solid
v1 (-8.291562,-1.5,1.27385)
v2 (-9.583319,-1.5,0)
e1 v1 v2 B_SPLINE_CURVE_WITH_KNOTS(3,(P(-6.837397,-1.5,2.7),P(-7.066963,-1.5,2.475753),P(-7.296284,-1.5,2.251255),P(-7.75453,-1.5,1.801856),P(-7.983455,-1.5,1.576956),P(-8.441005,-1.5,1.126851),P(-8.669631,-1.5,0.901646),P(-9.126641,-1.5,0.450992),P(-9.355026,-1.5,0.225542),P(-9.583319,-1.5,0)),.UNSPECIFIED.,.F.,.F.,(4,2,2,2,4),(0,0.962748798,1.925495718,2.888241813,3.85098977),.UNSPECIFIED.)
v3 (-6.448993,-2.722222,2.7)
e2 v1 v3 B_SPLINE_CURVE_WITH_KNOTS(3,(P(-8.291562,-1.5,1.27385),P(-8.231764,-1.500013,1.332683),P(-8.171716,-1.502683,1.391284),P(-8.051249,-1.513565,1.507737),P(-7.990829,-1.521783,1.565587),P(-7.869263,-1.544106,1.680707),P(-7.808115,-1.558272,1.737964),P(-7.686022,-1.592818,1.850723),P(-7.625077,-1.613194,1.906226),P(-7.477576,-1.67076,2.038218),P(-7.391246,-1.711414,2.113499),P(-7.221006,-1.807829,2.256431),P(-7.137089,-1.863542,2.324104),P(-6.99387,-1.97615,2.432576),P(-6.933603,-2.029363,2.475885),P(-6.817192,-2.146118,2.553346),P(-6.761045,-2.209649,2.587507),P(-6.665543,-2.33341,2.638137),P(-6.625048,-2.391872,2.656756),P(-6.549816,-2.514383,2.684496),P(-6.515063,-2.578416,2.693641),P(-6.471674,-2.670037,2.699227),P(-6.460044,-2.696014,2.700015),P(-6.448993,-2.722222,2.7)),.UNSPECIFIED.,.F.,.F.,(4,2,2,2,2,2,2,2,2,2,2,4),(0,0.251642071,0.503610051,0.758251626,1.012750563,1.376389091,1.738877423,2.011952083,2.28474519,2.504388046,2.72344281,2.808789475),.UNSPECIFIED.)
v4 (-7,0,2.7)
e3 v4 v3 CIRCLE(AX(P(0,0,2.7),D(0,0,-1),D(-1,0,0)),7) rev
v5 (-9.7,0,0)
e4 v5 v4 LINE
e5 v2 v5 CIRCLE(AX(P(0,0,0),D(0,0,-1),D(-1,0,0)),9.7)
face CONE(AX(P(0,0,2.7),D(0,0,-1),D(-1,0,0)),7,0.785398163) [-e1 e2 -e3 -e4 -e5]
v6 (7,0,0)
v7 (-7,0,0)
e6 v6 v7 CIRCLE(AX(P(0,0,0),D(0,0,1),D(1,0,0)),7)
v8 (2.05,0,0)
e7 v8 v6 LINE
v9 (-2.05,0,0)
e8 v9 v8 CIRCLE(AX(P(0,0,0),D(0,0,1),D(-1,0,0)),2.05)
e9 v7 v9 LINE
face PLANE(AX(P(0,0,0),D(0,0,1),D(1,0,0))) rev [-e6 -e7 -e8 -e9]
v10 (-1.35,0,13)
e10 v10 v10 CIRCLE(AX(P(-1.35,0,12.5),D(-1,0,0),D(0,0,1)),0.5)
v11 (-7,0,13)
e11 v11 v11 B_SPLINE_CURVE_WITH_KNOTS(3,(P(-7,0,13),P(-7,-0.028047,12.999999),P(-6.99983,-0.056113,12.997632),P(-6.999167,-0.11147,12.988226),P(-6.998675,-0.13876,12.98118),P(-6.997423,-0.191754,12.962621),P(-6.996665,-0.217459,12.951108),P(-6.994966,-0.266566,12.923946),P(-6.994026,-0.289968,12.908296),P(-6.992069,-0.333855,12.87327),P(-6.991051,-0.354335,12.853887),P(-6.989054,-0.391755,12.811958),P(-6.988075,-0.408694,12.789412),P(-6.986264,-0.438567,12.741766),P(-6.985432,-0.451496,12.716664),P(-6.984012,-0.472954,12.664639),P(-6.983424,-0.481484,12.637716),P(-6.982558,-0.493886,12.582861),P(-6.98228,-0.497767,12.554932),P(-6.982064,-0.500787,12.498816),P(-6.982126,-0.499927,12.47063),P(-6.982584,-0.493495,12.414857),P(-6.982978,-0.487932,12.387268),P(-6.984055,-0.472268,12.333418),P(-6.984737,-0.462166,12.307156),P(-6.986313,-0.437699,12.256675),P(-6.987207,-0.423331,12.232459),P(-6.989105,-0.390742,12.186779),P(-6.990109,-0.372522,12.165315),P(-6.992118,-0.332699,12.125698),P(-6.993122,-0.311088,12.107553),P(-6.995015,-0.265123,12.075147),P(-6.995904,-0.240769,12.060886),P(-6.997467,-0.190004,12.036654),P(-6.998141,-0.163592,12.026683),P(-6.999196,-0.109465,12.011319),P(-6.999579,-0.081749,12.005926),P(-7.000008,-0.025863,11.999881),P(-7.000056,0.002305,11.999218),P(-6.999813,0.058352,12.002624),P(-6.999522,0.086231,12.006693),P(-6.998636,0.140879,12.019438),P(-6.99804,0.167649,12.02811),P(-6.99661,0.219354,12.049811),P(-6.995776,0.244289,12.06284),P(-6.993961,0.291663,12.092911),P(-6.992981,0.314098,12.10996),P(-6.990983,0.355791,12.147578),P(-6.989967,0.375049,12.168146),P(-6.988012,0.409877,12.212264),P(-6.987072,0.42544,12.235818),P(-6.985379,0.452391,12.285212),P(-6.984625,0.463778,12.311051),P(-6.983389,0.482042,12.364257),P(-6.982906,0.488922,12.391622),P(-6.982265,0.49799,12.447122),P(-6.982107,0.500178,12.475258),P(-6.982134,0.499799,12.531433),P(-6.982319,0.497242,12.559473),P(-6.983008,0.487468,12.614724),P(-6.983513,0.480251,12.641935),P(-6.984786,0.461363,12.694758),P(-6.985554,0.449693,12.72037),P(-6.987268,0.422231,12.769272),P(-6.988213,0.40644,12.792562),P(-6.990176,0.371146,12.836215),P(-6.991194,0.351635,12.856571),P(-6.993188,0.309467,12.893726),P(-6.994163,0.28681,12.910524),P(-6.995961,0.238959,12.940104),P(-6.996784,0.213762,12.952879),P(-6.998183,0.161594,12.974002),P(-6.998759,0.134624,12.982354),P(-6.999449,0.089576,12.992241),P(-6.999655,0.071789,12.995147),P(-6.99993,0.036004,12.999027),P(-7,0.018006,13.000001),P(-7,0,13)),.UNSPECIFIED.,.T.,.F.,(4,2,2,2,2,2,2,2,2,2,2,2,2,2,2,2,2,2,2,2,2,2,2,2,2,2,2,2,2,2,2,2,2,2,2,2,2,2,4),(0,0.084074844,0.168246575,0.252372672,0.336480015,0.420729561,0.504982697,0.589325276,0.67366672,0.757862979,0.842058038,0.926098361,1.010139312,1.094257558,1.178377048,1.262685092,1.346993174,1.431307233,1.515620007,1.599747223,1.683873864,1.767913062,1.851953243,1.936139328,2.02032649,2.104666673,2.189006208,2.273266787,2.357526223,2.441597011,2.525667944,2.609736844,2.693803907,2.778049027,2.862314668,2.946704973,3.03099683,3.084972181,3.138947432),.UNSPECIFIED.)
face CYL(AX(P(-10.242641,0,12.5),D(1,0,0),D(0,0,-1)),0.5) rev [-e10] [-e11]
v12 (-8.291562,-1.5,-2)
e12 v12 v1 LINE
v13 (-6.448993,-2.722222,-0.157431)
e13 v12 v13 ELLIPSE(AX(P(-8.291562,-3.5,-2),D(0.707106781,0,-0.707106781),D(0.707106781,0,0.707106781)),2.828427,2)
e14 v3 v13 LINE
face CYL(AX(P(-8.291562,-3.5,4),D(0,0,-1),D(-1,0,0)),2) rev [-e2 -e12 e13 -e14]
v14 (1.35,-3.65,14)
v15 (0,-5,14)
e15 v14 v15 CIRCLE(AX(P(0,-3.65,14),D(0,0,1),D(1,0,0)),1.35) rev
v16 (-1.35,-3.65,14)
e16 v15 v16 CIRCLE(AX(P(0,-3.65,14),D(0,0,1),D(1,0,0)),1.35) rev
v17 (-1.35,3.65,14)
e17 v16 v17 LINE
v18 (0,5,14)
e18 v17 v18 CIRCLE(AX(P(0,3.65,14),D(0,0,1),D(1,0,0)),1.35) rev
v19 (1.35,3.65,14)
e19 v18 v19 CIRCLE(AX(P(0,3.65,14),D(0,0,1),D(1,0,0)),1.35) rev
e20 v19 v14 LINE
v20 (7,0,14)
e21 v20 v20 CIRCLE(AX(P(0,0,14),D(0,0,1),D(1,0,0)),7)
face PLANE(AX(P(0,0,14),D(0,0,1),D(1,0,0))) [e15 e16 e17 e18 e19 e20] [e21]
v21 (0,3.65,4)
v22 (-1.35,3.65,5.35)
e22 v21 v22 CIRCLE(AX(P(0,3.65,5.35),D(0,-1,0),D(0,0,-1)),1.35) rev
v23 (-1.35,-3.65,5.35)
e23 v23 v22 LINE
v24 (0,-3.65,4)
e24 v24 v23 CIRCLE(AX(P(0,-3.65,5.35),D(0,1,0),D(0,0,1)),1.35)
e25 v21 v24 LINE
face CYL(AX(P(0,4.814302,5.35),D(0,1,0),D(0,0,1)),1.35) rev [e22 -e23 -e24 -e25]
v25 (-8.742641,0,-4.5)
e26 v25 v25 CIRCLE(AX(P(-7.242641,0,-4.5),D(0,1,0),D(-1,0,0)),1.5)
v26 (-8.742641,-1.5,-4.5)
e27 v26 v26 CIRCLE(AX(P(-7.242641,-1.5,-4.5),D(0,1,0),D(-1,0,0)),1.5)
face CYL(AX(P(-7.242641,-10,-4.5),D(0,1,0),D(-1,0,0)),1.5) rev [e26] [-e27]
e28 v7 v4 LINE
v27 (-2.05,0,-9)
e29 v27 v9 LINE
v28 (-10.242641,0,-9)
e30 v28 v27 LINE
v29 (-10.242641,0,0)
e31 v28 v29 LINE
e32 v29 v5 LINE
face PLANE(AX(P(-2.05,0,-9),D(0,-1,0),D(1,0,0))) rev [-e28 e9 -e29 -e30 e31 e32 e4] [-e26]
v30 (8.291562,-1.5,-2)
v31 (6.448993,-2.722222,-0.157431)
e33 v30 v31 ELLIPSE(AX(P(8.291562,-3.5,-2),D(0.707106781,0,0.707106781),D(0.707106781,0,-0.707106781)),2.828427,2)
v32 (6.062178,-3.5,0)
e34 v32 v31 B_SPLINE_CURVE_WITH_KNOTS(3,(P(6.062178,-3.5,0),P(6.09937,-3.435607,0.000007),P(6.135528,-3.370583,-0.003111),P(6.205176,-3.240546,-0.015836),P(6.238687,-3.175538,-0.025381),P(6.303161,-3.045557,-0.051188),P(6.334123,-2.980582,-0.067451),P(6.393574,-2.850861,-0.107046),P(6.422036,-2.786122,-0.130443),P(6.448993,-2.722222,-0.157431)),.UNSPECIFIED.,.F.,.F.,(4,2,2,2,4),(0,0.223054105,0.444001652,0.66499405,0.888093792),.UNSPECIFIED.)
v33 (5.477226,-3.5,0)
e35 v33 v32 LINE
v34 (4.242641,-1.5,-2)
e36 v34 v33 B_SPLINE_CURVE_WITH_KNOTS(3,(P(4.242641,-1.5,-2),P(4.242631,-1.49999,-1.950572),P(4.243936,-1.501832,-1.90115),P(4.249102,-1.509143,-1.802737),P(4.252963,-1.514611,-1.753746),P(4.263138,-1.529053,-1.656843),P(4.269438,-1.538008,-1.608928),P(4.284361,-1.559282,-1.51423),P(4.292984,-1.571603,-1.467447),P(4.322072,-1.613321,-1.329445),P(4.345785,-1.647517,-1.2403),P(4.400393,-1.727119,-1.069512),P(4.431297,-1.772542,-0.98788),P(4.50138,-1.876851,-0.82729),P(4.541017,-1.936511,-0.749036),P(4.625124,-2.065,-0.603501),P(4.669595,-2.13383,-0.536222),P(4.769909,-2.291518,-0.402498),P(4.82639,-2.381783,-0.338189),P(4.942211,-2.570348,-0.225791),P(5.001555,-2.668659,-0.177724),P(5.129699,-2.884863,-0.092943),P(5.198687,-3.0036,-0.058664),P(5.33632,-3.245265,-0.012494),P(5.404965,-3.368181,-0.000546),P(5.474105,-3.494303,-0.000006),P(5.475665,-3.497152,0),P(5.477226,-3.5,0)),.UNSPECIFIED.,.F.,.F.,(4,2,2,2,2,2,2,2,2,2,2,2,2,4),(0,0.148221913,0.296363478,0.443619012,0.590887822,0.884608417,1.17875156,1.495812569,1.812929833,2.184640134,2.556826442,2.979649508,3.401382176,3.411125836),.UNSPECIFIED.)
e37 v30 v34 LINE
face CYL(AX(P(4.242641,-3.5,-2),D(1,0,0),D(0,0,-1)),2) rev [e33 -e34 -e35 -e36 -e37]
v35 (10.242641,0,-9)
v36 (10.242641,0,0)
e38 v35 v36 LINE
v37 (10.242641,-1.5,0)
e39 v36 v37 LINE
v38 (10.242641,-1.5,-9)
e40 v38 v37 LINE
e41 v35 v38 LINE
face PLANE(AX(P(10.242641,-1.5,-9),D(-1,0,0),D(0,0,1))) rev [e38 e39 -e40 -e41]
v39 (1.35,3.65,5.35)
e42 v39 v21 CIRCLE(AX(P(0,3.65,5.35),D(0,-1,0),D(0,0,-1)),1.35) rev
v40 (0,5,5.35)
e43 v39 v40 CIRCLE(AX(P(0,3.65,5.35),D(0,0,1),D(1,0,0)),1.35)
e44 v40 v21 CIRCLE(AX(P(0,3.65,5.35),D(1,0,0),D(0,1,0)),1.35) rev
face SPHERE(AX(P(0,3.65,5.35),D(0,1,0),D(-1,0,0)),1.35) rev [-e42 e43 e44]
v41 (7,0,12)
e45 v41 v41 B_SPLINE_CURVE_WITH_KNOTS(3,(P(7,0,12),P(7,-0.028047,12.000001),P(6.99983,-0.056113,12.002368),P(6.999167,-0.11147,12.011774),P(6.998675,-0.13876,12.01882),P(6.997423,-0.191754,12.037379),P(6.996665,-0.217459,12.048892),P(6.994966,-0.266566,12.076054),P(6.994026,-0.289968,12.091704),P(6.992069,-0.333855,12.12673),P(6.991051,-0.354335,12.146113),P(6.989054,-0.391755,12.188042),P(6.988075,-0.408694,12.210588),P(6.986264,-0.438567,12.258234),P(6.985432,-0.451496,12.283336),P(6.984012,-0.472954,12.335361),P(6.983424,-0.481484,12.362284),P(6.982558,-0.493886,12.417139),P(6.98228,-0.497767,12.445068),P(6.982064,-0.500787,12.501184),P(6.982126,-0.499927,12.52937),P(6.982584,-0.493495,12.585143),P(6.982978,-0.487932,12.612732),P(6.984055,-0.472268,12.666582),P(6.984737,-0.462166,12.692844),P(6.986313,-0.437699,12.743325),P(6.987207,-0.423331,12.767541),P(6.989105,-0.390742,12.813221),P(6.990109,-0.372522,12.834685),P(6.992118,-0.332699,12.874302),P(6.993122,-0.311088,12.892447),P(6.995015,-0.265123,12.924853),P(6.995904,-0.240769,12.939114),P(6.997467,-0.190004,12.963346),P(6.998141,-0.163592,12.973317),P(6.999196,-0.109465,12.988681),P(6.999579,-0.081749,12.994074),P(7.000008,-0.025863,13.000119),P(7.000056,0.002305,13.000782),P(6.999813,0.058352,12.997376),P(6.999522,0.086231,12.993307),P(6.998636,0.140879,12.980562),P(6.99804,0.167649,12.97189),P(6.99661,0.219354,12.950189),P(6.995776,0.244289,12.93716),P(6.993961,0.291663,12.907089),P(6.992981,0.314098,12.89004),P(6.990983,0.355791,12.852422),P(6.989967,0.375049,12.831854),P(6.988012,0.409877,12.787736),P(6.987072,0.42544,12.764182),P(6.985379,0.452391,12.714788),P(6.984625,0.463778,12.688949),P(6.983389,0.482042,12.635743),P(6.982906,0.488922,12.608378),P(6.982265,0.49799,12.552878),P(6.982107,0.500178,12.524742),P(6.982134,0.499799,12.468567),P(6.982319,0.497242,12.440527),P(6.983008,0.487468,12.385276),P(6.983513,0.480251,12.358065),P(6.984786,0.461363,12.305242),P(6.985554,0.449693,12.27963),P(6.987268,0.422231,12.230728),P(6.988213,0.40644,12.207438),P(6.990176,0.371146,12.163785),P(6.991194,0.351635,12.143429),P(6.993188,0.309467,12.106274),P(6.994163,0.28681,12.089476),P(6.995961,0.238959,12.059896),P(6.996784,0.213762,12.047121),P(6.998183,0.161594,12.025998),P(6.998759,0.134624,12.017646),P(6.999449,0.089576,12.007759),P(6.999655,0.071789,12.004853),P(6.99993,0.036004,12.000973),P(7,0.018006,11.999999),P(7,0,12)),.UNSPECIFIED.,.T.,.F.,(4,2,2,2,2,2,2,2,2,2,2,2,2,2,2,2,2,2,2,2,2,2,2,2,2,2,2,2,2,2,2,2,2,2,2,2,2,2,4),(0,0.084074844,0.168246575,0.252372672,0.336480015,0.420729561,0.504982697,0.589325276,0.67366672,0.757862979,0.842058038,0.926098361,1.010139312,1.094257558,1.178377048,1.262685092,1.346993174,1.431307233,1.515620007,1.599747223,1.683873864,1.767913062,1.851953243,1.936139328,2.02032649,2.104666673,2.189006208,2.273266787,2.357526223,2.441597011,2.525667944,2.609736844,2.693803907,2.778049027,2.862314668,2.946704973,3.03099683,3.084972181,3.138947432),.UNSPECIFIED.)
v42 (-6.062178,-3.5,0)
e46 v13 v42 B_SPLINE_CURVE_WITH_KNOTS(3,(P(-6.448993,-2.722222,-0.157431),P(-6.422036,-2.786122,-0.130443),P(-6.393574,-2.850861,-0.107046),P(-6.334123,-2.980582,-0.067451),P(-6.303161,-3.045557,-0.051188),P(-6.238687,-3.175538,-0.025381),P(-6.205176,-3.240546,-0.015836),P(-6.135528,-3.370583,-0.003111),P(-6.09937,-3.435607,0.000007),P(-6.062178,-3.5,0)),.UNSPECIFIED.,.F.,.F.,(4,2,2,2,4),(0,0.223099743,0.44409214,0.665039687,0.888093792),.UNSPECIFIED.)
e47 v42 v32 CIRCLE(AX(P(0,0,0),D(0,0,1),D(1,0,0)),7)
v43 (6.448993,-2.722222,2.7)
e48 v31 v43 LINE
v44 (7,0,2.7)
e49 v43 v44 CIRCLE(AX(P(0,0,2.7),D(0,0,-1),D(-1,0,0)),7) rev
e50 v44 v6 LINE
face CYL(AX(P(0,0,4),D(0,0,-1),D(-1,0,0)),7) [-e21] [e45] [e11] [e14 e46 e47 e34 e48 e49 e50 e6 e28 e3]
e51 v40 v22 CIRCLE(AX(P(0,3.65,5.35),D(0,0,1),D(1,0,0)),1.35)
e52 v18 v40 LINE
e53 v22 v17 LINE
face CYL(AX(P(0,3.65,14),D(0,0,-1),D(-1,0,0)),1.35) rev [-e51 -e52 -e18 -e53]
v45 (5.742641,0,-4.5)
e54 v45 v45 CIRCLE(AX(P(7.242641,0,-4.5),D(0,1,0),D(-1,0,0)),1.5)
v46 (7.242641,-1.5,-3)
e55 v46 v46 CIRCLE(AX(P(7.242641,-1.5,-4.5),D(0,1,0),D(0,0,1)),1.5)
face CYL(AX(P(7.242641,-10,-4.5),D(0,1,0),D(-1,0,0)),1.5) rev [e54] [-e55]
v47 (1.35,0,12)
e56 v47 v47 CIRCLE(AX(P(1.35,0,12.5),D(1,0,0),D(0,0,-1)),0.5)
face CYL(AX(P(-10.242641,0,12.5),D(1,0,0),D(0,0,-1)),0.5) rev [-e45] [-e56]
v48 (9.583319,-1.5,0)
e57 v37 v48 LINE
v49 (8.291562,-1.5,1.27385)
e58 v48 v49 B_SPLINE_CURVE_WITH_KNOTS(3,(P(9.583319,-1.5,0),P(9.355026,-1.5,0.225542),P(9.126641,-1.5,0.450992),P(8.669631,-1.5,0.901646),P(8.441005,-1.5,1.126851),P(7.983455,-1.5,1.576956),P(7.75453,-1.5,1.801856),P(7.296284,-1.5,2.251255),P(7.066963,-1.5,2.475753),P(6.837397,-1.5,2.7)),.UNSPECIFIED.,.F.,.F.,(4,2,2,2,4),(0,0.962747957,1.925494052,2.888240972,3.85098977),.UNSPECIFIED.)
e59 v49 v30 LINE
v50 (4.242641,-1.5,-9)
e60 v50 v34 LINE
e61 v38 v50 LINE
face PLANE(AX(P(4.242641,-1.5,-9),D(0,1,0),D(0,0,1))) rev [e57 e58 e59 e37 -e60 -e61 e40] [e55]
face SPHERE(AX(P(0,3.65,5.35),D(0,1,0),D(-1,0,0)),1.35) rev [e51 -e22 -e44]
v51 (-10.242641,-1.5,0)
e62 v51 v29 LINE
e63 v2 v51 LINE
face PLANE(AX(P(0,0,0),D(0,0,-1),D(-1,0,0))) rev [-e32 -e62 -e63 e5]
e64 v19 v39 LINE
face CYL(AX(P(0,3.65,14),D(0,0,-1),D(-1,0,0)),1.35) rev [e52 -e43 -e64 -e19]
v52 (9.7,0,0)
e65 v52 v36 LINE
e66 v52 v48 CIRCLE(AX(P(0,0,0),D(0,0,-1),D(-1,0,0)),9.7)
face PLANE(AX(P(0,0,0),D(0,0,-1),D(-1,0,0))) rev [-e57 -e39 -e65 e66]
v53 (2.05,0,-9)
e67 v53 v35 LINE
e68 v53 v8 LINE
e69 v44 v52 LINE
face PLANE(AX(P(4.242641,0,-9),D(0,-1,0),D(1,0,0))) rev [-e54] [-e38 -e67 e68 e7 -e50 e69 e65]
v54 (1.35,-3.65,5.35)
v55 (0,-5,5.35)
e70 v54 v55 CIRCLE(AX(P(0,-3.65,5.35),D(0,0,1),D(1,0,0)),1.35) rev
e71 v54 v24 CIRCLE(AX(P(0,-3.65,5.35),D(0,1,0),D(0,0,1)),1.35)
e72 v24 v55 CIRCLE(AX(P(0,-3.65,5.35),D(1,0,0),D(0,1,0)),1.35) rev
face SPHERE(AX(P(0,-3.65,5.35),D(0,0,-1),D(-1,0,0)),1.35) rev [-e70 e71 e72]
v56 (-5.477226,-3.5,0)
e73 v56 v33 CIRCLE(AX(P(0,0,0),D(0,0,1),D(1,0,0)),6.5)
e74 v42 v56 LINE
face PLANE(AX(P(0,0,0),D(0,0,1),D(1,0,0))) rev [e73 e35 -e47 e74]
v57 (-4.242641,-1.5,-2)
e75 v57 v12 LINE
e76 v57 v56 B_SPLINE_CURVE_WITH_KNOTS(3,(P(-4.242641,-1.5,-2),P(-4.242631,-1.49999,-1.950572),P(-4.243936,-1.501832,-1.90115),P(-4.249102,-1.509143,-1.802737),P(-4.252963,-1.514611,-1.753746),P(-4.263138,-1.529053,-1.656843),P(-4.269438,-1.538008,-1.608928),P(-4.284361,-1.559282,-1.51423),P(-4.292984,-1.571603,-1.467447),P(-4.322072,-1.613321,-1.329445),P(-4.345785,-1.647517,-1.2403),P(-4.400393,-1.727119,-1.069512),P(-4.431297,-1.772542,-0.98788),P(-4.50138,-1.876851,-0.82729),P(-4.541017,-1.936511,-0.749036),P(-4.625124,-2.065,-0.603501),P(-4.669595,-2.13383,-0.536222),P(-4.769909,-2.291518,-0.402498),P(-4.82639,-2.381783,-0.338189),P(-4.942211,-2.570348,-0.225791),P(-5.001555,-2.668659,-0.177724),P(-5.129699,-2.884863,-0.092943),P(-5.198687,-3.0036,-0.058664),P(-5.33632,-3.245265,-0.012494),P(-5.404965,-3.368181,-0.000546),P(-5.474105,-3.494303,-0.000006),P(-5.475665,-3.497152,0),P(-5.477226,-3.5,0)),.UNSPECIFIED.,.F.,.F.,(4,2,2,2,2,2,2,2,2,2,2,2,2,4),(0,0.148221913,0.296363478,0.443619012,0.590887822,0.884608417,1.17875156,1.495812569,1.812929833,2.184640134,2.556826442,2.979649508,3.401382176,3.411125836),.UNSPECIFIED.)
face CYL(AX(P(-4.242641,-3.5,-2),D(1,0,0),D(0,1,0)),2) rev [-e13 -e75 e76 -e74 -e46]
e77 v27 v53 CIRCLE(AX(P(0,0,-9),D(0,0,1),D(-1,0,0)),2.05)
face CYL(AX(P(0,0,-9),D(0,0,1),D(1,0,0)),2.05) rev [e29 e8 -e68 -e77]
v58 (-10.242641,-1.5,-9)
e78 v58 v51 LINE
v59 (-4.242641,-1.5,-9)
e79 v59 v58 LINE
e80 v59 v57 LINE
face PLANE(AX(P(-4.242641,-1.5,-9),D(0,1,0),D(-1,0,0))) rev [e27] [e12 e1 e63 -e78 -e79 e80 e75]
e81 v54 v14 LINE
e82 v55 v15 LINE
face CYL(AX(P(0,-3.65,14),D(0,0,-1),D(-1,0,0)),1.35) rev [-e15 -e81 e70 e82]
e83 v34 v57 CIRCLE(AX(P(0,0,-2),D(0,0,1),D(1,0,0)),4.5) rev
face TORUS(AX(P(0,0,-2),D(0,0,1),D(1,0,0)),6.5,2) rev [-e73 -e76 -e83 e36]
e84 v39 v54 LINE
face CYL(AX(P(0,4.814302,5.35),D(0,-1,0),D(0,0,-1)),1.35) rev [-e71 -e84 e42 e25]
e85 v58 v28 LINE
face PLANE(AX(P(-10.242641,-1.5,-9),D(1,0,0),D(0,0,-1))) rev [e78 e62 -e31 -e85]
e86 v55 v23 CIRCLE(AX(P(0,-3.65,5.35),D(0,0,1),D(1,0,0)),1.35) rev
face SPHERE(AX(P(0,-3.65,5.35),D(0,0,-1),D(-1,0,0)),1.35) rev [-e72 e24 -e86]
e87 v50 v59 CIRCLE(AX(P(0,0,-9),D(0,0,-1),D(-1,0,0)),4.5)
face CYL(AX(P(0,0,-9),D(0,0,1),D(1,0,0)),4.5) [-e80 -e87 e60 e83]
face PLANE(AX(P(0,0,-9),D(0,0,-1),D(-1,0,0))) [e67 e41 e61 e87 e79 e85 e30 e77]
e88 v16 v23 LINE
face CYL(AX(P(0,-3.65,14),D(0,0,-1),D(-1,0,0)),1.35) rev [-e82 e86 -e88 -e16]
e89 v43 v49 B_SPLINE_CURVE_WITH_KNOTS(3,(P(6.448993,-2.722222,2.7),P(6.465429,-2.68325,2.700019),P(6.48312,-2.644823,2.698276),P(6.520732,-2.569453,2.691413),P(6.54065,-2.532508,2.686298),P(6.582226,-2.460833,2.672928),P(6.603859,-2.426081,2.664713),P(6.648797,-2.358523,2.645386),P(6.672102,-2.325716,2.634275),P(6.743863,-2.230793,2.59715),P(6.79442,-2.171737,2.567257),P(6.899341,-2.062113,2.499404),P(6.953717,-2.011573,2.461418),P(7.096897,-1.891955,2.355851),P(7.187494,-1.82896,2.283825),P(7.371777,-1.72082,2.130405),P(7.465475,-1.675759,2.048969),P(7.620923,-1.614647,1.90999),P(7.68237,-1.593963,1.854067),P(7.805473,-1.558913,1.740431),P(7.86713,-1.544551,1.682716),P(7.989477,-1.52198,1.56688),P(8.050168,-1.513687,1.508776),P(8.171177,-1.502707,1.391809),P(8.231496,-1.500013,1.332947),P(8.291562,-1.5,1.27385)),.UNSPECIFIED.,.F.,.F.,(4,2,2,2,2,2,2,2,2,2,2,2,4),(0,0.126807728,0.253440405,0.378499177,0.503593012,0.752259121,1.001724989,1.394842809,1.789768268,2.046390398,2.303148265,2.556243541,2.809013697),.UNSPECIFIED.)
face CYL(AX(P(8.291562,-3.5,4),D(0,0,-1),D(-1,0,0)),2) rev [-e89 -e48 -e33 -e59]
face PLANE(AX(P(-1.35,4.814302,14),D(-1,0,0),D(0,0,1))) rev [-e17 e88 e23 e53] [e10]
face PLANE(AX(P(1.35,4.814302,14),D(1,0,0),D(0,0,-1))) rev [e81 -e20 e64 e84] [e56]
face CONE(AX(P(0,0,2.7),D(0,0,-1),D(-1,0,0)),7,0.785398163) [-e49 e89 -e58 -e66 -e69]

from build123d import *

# Parameters (mm, degrees)
SKETCH1_R           = 7
BOSS_EXTRUDE1_DEPTH = 4
SKETCH2_R           = 7
SKETCH2_R_2         = 5
BOSS_EXTRUDE2_DEPTH = 10
BOSS_EXTRUDE3_DEPTH = 10
BOSS_EXTRUDE4_DEPTH = 9
FILLET3_R           = 1.35
CHAMFER1_SIZE       = 2.7
SKETCH7_R           = 1.5
CUT_EXTRUDE1_DEPTH  = 10
FILLET4_R           = 2
SKETCH8_R           = 0.5
CUT_EXTRUDE2_DEPTH  = 25.534299997


# Some blends are built 0.0001 mm under size
with BuildPart() as part:
    # Sketch1 → Boss-Extrude1 (new body)
    with BuildSketch(Plane.XY):
        Circle(SKETCH1_R)
    extrude(amount=BOSS_EXTRUDE1_DEPTH)

    # Sketch2 → Boss-Extrude2 (add)
    with BuildSketch(Plane.XY.offset(4)):
        Circle(SKETCH2_R)
        Circle(SKETCH2_R_2, mode=Mode.SUBTRACT)
    extrude(amount=BOSS_EXTRUDE2_DEPTH)

    # Sketch3 → Boss-Extrude3 (add)
    with BuildSketch(Plane.XY.offset(4)):
        with BuildLine():
            Line((-1.35, 4.814301611), (-1.35, -4.814301611))
            ThreePointArc((-1.35, -4.814301611), (-5, 0), (-1.35, 4.814301611))
        make_face()
        with BuildLine():
            Line((1.35, 4.814301611), (1.35, -4.814301611))
            ThreePointArc((1.35, -4.814301611), (5, 0), (1.35, 4.814301611))
        make_face()
    extrude(amount=BOSS_EXTRUDE3_DEPTH)

    # Sketch4 → Boss-Extrude4 (add)
    with BuildSketch(Plane(origin=(0, 0, 0), x_dir=(-1, 0, 0), z_dir=(0, 0, -1))):
        with BuildLine():
            Line((2.05, 0), (4.242640687, 0))
            Line((4.242640687, 0), (10.242640687, 0))
            Line((10.242640687, 0), (10.242640687, -1.5))
            Line((10.242640687, -1.5), (4.242640687, -1.5))
            ThreePointArc((4.242640687, -1.5), (0, -4.5), (-4.242640687, -1.5))
            Line((-4.242640687, -1.5), (-10.242640687, -1.5))
            Line((-10.242640687, -1.5), (-10.242640687, 0))
            Line((-10.242640687, 0), (-4.242640687, 0))
            Line((-4.242640687, 0), (-2.05, 0))
            ThreePointArc((-2.05, 0), (0, -2.05), (2.05, 0))
        make_face()
    extrude(amount=BOSS_EXTRUDE4_DEPTH)

    # Fillet3
    fillet3_edges = [part.edges().sort_by_distance(p)[0] for p in [
        (-1.35, 4.814301611, 9),
    ]]
    fillet(fillet3_edges, radius=FILLET3_R)
    fillet3_2_edges = [part.edges().sort_by_distance(p)[0] for p in [
        (1.35, 4.814301611, 9),
    ]]
    fillet(fillet3_2_edges, radius=FILLET3_R - 0.0001)  # a hair under: the kernel refuses the full size
    fillet3_3_edges = [part.edges().sort_by_distance(p)[0] for p in [
        (1.35, -4.814301611, 9),
    ]]
    fillet(fillet3_3_edges, radius=FILLET3_R)
    fillet3_4_edges = [part.edges().sort_by_distance(p)[0] for p in [
        (-1.35, -4.814301611, 9),
    ]]
    fillet(fillet3_4_edges, radius=FILLET3_R - 0.0001)  # a hair under: the kernel refuses the full size
    fillet3_5_edges = [part.edges().sort_by_distance(p)[0] for p in [
        (-1.35, -4.9999e-05, 4),
    ]]
    fillet(fillet3_5_edges, radius=FILLET3_R - 0.0001)  # a hair under: the kernel refuses the full size

    # Chamfer1
    # the kernel refuses this chamfer: 2.7 mm, written as the material it adds along each edge
    with BuildSketch(Plane(origin=(0, 0, 0), x_dir=(-1, 0, 0), z_dir=(0, 1, 0))) as chamfer1_piece_1_section:
        Polygon((7, CHAMFER1_SIZE), (7 + CHAMFER1_SIZE, 0), (7, 0), align=None)
    chamfer1_piece_1 = revolve(axis=Axis((0, 0, 0), (0, 0, 1)), revolution_arc=69.20773796, mode=Mode.PRIVATE)
    chamfer1_piece_1 = split(chamfer1_piece_1, bisect_by=Plane(origin=(-7.851109484, -1.5, 0.900303531), z_dir=(0, 1, 0)), keep=Keep.TOP, mode=Mode.PRIVATE)
    add(chamfer1_piece_1)
    with BuildSketch(Plane(origin=(0, 0, 0), x_dir=(0.3549807082679851, -0.9348736260894087, 0), z_dir=(-0.9348736260894087, -0.3549807082679851, 0))) as chamfer1_piece_2_section:
        Polygon((7, CHAMFER1_SIZE), (7 + CHAMFER1_SIZE, 0), (7, 0), align=None)
    chamfer1_piece_2 = revolve(axis=Axis((0, 0, 0), (0, 0, 1)), revolution_arc=69.20773796, mode=Mode.PRIVATE)
    chamfer1_piece_2 = split(chamfer1_piece_2, bisect_by=Plane(origin=(7.851109484, -1.5, 0.900303531), z_dir=(0, 1, 0)), keep=Keep.TOP, mode=Mode.PRIVATE)
    add(chamfer1_piece_2)

    # Sketch7 → Cut-Extrude1 (cut)
    with BuildSketch(Plane(origin=(0, 0, 0), x_dir=(1, 0, 0), z_dir=(0, 1, 0))):
        with Locations(Location((7.242640687, 4.5, 0), (0, 0, 180))):
            Circle(SKETCH7_R)
        with Locations(Location((-7.242640687, 4.5, 0), (0, 0, 180))):
            Circle(SKETCH7_R)
    extrude(amount=-CUT_EXTRUDE1_DEPTH, mode=Mode.SUBTRACT)

    # Fillet4
    fillet4_edges = [part.edges().sort_by_distance(p)[0] for p in [
        (-6.837397166, -1.5, 1.35),
        (6.837397166, -1.5, 1.35),
        (-5.540018926, -1.5, 0),
        (5.540018926, -1.5, 0),
        (0, -4.5, 0),
    ]]
    fillet(fillet4_edges, radius=FILLET4_R)

    # Sketch8 → Cut-Extrude2 (cut, through all)
    with BuildSketch(Plane(origin=(8.65, 0, 0), x_dir=(0, 0, -1), z_dir=(1, 0, 0))):
        with Locations((-12.5, 0)):
            Circle(SKETCH8_R)
    extrude(amount=-CUT_EXTRUDE2_DEPTH, mode=Mode.SUBTRACT)


solid = part.part
